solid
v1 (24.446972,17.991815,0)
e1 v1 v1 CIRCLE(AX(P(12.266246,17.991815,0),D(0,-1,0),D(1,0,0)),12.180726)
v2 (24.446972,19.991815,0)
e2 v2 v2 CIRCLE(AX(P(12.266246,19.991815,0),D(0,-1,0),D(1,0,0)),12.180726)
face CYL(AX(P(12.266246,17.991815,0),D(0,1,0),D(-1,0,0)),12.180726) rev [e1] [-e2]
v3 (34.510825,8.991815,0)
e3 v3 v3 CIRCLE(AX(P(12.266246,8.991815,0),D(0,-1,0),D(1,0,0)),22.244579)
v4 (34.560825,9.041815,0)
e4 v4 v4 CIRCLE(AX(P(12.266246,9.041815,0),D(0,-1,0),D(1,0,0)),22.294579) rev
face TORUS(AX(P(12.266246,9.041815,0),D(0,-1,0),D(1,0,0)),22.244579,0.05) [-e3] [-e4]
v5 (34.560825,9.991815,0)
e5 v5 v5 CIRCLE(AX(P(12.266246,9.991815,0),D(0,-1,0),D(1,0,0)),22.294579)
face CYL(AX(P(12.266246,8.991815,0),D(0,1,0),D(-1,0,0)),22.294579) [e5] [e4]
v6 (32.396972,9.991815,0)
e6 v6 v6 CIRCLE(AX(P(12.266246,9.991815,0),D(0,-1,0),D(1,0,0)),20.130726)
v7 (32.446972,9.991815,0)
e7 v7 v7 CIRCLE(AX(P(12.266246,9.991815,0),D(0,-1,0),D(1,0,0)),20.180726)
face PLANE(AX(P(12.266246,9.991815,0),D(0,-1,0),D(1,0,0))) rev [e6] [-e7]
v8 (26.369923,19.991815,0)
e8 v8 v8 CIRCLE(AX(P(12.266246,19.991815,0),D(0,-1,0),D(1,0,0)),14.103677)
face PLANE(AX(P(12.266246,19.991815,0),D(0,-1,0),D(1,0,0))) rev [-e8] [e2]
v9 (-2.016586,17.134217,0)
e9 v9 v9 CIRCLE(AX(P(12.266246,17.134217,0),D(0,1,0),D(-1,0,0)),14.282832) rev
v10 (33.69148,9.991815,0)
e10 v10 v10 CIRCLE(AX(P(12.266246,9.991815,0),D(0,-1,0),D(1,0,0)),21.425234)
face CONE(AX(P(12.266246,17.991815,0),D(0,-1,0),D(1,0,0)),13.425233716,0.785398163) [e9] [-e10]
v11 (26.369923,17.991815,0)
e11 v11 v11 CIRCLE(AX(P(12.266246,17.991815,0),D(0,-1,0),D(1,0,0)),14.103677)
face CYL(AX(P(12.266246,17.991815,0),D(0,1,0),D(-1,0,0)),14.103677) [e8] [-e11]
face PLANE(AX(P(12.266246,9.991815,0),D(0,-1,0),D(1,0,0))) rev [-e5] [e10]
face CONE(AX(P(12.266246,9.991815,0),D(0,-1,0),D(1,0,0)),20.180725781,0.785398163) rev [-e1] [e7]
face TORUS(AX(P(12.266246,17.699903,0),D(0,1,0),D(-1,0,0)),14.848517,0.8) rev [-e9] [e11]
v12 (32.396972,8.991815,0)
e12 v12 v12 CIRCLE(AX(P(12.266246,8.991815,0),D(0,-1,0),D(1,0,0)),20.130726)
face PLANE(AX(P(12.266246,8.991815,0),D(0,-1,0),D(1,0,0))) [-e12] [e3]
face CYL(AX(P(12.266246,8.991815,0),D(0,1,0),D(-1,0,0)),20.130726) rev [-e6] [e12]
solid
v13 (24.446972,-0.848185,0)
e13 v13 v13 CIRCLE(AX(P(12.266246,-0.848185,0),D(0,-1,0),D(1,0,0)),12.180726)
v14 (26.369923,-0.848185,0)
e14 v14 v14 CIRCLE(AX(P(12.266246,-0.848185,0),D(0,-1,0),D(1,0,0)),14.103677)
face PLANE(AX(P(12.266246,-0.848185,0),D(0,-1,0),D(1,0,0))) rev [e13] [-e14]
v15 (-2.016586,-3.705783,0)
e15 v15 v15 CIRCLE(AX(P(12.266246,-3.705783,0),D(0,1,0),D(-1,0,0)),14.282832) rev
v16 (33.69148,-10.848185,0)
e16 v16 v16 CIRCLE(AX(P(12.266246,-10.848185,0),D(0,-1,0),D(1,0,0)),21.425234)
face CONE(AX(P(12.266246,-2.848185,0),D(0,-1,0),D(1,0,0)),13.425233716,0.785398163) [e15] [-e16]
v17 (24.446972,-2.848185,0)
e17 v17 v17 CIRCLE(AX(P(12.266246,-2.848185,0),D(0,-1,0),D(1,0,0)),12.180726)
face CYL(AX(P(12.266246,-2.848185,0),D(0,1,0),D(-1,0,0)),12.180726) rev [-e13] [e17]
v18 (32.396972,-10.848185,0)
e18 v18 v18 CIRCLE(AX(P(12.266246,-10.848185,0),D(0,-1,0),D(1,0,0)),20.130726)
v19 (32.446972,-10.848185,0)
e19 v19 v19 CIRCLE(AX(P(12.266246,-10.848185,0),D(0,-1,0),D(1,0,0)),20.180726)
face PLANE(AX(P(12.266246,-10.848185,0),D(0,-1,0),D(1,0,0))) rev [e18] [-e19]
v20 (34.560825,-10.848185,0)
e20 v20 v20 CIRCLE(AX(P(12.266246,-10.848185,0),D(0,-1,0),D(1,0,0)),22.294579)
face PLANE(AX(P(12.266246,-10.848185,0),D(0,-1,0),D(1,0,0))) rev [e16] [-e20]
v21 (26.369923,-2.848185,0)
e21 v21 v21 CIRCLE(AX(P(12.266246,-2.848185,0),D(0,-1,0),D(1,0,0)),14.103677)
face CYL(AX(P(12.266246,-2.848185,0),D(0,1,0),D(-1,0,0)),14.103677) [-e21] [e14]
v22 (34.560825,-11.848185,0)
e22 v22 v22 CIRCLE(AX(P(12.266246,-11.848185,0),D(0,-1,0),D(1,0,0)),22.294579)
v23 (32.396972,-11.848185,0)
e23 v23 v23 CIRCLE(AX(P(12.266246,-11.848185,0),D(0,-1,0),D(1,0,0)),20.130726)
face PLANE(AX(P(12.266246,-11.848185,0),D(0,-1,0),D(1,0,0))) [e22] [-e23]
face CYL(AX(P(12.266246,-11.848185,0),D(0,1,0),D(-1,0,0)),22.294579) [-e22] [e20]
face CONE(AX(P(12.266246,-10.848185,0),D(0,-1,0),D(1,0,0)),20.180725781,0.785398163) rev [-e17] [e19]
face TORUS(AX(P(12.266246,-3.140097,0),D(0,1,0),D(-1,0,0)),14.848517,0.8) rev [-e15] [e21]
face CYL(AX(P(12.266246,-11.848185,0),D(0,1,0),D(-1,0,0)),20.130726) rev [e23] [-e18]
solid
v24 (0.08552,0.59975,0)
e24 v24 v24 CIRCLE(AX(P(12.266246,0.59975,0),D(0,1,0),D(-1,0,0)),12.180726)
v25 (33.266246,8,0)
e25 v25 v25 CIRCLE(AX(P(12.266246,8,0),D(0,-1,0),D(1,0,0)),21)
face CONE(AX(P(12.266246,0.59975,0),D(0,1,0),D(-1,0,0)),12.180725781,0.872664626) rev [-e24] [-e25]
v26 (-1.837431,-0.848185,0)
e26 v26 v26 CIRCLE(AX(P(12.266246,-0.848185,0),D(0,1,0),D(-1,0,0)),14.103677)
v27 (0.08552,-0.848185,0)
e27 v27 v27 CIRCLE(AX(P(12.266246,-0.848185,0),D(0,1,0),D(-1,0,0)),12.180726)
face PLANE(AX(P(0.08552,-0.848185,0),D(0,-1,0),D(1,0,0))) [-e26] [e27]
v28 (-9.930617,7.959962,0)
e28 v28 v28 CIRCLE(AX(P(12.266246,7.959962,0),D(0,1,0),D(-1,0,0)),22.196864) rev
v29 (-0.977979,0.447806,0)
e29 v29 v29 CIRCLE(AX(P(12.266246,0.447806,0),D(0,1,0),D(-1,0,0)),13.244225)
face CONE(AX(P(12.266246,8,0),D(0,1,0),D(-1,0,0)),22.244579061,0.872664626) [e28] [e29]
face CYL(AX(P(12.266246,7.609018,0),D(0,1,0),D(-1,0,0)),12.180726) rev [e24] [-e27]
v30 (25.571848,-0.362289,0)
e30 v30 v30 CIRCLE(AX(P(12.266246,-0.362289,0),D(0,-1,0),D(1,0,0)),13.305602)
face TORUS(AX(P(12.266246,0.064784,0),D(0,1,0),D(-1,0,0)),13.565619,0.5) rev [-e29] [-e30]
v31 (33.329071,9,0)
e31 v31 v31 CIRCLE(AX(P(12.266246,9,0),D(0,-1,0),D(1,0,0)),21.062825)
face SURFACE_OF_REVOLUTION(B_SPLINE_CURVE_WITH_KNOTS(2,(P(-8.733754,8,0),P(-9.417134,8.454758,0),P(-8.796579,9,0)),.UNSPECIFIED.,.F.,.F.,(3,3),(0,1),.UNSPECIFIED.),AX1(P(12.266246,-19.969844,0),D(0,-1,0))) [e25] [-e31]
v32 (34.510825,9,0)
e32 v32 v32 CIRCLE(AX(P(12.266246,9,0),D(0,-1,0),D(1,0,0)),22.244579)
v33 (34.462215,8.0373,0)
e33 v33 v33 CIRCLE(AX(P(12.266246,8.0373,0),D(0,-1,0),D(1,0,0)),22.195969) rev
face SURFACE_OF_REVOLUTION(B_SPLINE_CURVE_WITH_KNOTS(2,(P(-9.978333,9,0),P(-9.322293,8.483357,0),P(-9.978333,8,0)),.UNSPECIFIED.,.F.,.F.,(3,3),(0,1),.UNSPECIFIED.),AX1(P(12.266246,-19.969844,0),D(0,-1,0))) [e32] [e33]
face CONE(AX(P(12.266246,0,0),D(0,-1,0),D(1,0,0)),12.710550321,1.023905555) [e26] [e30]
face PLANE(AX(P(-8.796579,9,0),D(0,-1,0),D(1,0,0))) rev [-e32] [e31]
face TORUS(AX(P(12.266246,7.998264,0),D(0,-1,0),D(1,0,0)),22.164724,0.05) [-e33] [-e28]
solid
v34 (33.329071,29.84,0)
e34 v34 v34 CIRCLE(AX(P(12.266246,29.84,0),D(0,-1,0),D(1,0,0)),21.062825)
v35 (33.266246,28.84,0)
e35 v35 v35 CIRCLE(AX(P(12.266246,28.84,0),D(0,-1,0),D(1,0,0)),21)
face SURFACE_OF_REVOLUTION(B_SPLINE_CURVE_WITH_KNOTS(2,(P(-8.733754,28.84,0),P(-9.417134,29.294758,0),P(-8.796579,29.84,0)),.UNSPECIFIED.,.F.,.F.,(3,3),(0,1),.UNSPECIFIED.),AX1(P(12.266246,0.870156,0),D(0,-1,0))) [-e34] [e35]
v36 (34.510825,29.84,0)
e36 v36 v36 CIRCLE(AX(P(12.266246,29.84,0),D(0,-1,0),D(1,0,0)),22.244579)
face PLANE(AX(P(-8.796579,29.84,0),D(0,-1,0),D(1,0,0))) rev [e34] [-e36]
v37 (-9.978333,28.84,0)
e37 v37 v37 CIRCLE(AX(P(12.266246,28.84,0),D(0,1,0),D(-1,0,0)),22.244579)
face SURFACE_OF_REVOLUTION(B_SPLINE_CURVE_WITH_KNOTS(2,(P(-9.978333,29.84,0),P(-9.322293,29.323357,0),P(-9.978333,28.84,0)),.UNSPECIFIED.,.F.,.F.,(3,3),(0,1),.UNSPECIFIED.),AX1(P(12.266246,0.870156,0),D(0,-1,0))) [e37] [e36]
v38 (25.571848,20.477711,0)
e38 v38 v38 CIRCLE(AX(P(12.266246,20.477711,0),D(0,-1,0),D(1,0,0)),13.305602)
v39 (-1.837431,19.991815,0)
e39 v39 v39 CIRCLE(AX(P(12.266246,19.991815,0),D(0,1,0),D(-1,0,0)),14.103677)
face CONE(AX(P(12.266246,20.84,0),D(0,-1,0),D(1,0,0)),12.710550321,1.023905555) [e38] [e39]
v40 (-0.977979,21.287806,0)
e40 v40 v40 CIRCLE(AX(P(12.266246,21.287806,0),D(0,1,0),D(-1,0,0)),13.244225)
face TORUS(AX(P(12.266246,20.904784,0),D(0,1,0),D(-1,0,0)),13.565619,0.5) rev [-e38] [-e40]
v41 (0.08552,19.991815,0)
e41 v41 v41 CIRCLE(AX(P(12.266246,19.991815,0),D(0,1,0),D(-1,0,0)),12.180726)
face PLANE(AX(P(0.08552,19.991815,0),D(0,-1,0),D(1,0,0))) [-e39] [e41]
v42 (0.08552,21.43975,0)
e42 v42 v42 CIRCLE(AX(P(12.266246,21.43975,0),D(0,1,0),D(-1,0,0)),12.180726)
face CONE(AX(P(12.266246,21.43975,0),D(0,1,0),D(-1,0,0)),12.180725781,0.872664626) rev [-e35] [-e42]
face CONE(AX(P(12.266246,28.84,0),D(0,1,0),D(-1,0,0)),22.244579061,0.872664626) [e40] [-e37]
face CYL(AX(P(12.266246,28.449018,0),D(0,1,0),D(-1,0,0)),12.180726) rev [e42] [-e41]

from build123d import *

# Parameters (mm, degrees)
ACTIVE_FILLET_R     = 0.5
SKETCH11_R          = 14.103676922
SKETCH11_R_2        = 12.180725781
COLLAR_DEPTH        = 2
PASSIVE_FILLET_R    = 0.8
SKETCH18_R          = 22.294579061
SKETCH18_R_2        = 20.130725781
BOSS_EXTRUDE4_DEPTH = 1
FILLET3_R           = 0.05
FILLET7_R           = 0.05


# Read off the part's stored shape, not the designer's step: Body-Move/Copy2
with BuildPart() as part:
    # Sketch1 → Main Active (revolve)
    with BuildSketch(Plane.XY):
        Polygon((-0.44430417, 0), (-9.978332911, 8), (-8.73375385, 8), (0.085520369, 0.599750256), (0.085520369, -0.848184734), (-1.837430772, -0.848184734), align=None)
    revolve(axis=Axis((12.26624615, 7.609018033, 0), (0, -1, 0)))

    # Active fillet
    active_fillet_edges = [part.edges().sort_by_distance(p)[0] for p in [
        (24.976796471, 0, 0),
    ]]
    fillet(active_fillet_edges, radius=ACTIVE_FILLET_R)

    # Sketch17 → Neck Curve (revolve)
    with BuildSketch(Plane.XY, mode=Mode.PRIVATE) as neck_curve_sk:
        with BuildLine():
            Line((-9.978332911, 8), (-8.73375385, 8))
            add(Edge.make_bspline(
                [(-8.73375385, 8), (-9.417134244, 8.454758025), (-8.796578829, 9)],
                knots=[0, 0, 0, 1, 1, 1], degree=2))
            Line((-8.796578829, 9), (-9.978332911, 9))
            add(Edge.make_bspline(
                [(-9.978332911, 8), (-9.322292514, 8.483356917), (-9.978332911, 9)],
                knots=[0, 0, 0, 1, 1, 1], degree=2))
        make_face()
    revolve(neck_curve_sk.sketch.rotate(Axis((12.26624615, -19.96984433, 0), (0, 1, 0)), 180), axis=Axis((12.26624615, -19.96984433, 0), (0, 1, 0)))

    # Fillet3
    fillet3_edges = [part.edges().sort_by_distance(p)[0] for p in [
        (12.26624615, 8, -22.244579061),
    ]]
    fillet(fillet3_edges, radius=FILLET3_R)


with BuildPart() as body_2:
    # Sketch11 → collar (new body)
    with BuildSketch(Plane.XZ.offset(0.848184734)):
        with Locations((12.26624615, 0)):
            Circle(SKETCH11_R)
        with Locations((12.26624615, 0)):
            Circle(SKETCH11_R_2, mode=Mode.SUBTRACT)
    extrude(amount=COLLAR_DEPTH)

    # Sketch14 → Passive Element (revolve)
    with BuildSketch(Plane.XY, mode=Mode.PRIVATE) as passive_element_sk:
        Polygon((-1.158987566, -2.848184734), (-9.158987566, -10.848184734), (-7.914479631, -10.848184734), (0.085520369, -2.848184734), align=None)
    revolve(passive_element_sk.sketch.rotate(Axis((12.26624615, -19.96984433, 0), (0, 1, 0)), 180), axis=Axis((12.26624615, -19.96984433, 0), (0, 1, 0)))

    # Passive Fillet
    # the kernel refuses this fillet: 0.8 mm, written as the material it adds along each edge
    with BuildSketch(Plane(origin=(12.26624615, -2.848184734, 0), x_dir=(1, 0, 0), z_dir=(0, 0, 1))) as passive_fillet_piece_1:
        with BuildLine():
            CenterArc((14.848517188, -0.291912621), PASSIVE_FILLET_R, 158.599138918, 66.400861082)
            Line((14.282831763, -0.857598046), (14.271518054, -0.868911755))
            Line((14.271518054, -0.868911755), (13.413920008, -0.011313708))
            Line((13.413920008, -0.011313708), (13.425233716, 0.016))
            ThreePointArc((13.425233716, 0.016), (13.764455319, 0.016), (14.088780117, 0.005838252))
            Line((14.088780117, 0.005838252), (14.103676922, 0))
        make_face()
    revolve(axis=Axis((12.26624615, -2.848184734, 0), (0, 1, 0)))

    # Sketch18 → Boss-Extrude4 (add)
    with BuildSketch(Plane.XZ.offset(10.848184734)):
        with Locations((12.26624615, 0)):
            Circle(SKETCH18_R)
        with Locations((12.26624615, 0)):
            Circle(SKETCH18_R_2, mode=Mode.SUBTRACT)
    extrude(amount=BOSS_EXTRUDE4_DEPTH)


with BuildPart() as body_3:
    # Body-Move/Copy2 outline → Body-Move/Copy2 (revolve)
    with BuildSketch(Plane(origin=(12.26624615, 0, 0), x_dir=(1, 0, 0), z_dir=(0, 0, 1))):
        with BuildLine():
            Line((14.103676922, 19.991815266), (13.305602068, 20.477711456))
            ThreePointArc((13.305602068, 20.477711456), (13.067048008, 20.867010025), (13.24422527, 21.287806453))
            Line((13.24422527, 21.287806453), (22.244579061, 28.84))
            add(Edge.make_bspline(
                [(22.244579061, 29.84), (21.588538664, 29.323356917), (22.244579061, 28.84)],
                knots=[0, 0, 0, 1, 1, 1], degree=2))
            Line((22.244579061, 29.84), (21.062824979, 29.84))
            add(Edge.make_bspline(
                [(21.062824979, 29.84), (21.683380394, 29.294758025), (21, 28.84)],
                knots=[0.048181037, 0.048181037, 0.048181037, 1.048181037, 1.048181037, 1.048181037], degree=2))
            Line((21, 28.84), (12.180725781, 21.439750256))
            Line((12.180725781, 21.439750256), (12.180725781, 19.991815266))
            Line((12.180725781, 19.991815266), (14.103676922, 19.991815266))
        make_face()
    revolve(axis=Axis((12.26624615, 0, 0), (0, 1, 0)))


with BuildPart() as body_4:
    # Body-Move_Copy2 2 outline → Body-Move_Copy2 2 (revolve)
    with BuildSketch(Plane(origin=(12.26624615, 0, 0), x_dir=(1, 0, 0), z_dir=(0, 0, 1))):
        with BuildLine():
            Line((14.103676922, 19.991815266), (12.180725781, 19.991815266))
            Line((12.180725781, 19.991815266), (12.180725781, 17.991815266))
            Line((12.180725781, 17.991815266), (20.180725781, 9.991815266))
            Line((20.180725781, 9.991815266), (20.130725781, 9.991815266))
            Line((20.130725781, 9.991815266), (20.130725781, 8.991815266))
            Line((20.130725781, 8.991815266), (22.294579061, 8.991815266))
            Line((22.294579061, 8.991815266), (22.294579061, 9.991815266))
            Line((22.294579061, 9.991815266), (21.425233716, 9.991815266))
            Line((21.425233716, 9.991815266), (14.282831763, 17.134217219))
            ThreePointArc((14.282831763, 17.134217219), (14.065422047, 17.536311687), (14.103676922, 17.991815266))
            Line((14.103676922, 17.991815266), (14.103676922, 19.991815266))
        make_face()
    revolve(axis=Axis((12.26624615, 0, 0), (0, 1, 0)))

    # Fillet7
    fillet7_edges = [body_4.edges().sort_by_distance(p)[0] for p in [
        (-10.028332911, 8.991815266, 0),
    ]]
    fillet(fillet7_edges, radius=FILLET7_R)


solid = Compound([part.part, body_2.part, body_3.part, body_4.part])
